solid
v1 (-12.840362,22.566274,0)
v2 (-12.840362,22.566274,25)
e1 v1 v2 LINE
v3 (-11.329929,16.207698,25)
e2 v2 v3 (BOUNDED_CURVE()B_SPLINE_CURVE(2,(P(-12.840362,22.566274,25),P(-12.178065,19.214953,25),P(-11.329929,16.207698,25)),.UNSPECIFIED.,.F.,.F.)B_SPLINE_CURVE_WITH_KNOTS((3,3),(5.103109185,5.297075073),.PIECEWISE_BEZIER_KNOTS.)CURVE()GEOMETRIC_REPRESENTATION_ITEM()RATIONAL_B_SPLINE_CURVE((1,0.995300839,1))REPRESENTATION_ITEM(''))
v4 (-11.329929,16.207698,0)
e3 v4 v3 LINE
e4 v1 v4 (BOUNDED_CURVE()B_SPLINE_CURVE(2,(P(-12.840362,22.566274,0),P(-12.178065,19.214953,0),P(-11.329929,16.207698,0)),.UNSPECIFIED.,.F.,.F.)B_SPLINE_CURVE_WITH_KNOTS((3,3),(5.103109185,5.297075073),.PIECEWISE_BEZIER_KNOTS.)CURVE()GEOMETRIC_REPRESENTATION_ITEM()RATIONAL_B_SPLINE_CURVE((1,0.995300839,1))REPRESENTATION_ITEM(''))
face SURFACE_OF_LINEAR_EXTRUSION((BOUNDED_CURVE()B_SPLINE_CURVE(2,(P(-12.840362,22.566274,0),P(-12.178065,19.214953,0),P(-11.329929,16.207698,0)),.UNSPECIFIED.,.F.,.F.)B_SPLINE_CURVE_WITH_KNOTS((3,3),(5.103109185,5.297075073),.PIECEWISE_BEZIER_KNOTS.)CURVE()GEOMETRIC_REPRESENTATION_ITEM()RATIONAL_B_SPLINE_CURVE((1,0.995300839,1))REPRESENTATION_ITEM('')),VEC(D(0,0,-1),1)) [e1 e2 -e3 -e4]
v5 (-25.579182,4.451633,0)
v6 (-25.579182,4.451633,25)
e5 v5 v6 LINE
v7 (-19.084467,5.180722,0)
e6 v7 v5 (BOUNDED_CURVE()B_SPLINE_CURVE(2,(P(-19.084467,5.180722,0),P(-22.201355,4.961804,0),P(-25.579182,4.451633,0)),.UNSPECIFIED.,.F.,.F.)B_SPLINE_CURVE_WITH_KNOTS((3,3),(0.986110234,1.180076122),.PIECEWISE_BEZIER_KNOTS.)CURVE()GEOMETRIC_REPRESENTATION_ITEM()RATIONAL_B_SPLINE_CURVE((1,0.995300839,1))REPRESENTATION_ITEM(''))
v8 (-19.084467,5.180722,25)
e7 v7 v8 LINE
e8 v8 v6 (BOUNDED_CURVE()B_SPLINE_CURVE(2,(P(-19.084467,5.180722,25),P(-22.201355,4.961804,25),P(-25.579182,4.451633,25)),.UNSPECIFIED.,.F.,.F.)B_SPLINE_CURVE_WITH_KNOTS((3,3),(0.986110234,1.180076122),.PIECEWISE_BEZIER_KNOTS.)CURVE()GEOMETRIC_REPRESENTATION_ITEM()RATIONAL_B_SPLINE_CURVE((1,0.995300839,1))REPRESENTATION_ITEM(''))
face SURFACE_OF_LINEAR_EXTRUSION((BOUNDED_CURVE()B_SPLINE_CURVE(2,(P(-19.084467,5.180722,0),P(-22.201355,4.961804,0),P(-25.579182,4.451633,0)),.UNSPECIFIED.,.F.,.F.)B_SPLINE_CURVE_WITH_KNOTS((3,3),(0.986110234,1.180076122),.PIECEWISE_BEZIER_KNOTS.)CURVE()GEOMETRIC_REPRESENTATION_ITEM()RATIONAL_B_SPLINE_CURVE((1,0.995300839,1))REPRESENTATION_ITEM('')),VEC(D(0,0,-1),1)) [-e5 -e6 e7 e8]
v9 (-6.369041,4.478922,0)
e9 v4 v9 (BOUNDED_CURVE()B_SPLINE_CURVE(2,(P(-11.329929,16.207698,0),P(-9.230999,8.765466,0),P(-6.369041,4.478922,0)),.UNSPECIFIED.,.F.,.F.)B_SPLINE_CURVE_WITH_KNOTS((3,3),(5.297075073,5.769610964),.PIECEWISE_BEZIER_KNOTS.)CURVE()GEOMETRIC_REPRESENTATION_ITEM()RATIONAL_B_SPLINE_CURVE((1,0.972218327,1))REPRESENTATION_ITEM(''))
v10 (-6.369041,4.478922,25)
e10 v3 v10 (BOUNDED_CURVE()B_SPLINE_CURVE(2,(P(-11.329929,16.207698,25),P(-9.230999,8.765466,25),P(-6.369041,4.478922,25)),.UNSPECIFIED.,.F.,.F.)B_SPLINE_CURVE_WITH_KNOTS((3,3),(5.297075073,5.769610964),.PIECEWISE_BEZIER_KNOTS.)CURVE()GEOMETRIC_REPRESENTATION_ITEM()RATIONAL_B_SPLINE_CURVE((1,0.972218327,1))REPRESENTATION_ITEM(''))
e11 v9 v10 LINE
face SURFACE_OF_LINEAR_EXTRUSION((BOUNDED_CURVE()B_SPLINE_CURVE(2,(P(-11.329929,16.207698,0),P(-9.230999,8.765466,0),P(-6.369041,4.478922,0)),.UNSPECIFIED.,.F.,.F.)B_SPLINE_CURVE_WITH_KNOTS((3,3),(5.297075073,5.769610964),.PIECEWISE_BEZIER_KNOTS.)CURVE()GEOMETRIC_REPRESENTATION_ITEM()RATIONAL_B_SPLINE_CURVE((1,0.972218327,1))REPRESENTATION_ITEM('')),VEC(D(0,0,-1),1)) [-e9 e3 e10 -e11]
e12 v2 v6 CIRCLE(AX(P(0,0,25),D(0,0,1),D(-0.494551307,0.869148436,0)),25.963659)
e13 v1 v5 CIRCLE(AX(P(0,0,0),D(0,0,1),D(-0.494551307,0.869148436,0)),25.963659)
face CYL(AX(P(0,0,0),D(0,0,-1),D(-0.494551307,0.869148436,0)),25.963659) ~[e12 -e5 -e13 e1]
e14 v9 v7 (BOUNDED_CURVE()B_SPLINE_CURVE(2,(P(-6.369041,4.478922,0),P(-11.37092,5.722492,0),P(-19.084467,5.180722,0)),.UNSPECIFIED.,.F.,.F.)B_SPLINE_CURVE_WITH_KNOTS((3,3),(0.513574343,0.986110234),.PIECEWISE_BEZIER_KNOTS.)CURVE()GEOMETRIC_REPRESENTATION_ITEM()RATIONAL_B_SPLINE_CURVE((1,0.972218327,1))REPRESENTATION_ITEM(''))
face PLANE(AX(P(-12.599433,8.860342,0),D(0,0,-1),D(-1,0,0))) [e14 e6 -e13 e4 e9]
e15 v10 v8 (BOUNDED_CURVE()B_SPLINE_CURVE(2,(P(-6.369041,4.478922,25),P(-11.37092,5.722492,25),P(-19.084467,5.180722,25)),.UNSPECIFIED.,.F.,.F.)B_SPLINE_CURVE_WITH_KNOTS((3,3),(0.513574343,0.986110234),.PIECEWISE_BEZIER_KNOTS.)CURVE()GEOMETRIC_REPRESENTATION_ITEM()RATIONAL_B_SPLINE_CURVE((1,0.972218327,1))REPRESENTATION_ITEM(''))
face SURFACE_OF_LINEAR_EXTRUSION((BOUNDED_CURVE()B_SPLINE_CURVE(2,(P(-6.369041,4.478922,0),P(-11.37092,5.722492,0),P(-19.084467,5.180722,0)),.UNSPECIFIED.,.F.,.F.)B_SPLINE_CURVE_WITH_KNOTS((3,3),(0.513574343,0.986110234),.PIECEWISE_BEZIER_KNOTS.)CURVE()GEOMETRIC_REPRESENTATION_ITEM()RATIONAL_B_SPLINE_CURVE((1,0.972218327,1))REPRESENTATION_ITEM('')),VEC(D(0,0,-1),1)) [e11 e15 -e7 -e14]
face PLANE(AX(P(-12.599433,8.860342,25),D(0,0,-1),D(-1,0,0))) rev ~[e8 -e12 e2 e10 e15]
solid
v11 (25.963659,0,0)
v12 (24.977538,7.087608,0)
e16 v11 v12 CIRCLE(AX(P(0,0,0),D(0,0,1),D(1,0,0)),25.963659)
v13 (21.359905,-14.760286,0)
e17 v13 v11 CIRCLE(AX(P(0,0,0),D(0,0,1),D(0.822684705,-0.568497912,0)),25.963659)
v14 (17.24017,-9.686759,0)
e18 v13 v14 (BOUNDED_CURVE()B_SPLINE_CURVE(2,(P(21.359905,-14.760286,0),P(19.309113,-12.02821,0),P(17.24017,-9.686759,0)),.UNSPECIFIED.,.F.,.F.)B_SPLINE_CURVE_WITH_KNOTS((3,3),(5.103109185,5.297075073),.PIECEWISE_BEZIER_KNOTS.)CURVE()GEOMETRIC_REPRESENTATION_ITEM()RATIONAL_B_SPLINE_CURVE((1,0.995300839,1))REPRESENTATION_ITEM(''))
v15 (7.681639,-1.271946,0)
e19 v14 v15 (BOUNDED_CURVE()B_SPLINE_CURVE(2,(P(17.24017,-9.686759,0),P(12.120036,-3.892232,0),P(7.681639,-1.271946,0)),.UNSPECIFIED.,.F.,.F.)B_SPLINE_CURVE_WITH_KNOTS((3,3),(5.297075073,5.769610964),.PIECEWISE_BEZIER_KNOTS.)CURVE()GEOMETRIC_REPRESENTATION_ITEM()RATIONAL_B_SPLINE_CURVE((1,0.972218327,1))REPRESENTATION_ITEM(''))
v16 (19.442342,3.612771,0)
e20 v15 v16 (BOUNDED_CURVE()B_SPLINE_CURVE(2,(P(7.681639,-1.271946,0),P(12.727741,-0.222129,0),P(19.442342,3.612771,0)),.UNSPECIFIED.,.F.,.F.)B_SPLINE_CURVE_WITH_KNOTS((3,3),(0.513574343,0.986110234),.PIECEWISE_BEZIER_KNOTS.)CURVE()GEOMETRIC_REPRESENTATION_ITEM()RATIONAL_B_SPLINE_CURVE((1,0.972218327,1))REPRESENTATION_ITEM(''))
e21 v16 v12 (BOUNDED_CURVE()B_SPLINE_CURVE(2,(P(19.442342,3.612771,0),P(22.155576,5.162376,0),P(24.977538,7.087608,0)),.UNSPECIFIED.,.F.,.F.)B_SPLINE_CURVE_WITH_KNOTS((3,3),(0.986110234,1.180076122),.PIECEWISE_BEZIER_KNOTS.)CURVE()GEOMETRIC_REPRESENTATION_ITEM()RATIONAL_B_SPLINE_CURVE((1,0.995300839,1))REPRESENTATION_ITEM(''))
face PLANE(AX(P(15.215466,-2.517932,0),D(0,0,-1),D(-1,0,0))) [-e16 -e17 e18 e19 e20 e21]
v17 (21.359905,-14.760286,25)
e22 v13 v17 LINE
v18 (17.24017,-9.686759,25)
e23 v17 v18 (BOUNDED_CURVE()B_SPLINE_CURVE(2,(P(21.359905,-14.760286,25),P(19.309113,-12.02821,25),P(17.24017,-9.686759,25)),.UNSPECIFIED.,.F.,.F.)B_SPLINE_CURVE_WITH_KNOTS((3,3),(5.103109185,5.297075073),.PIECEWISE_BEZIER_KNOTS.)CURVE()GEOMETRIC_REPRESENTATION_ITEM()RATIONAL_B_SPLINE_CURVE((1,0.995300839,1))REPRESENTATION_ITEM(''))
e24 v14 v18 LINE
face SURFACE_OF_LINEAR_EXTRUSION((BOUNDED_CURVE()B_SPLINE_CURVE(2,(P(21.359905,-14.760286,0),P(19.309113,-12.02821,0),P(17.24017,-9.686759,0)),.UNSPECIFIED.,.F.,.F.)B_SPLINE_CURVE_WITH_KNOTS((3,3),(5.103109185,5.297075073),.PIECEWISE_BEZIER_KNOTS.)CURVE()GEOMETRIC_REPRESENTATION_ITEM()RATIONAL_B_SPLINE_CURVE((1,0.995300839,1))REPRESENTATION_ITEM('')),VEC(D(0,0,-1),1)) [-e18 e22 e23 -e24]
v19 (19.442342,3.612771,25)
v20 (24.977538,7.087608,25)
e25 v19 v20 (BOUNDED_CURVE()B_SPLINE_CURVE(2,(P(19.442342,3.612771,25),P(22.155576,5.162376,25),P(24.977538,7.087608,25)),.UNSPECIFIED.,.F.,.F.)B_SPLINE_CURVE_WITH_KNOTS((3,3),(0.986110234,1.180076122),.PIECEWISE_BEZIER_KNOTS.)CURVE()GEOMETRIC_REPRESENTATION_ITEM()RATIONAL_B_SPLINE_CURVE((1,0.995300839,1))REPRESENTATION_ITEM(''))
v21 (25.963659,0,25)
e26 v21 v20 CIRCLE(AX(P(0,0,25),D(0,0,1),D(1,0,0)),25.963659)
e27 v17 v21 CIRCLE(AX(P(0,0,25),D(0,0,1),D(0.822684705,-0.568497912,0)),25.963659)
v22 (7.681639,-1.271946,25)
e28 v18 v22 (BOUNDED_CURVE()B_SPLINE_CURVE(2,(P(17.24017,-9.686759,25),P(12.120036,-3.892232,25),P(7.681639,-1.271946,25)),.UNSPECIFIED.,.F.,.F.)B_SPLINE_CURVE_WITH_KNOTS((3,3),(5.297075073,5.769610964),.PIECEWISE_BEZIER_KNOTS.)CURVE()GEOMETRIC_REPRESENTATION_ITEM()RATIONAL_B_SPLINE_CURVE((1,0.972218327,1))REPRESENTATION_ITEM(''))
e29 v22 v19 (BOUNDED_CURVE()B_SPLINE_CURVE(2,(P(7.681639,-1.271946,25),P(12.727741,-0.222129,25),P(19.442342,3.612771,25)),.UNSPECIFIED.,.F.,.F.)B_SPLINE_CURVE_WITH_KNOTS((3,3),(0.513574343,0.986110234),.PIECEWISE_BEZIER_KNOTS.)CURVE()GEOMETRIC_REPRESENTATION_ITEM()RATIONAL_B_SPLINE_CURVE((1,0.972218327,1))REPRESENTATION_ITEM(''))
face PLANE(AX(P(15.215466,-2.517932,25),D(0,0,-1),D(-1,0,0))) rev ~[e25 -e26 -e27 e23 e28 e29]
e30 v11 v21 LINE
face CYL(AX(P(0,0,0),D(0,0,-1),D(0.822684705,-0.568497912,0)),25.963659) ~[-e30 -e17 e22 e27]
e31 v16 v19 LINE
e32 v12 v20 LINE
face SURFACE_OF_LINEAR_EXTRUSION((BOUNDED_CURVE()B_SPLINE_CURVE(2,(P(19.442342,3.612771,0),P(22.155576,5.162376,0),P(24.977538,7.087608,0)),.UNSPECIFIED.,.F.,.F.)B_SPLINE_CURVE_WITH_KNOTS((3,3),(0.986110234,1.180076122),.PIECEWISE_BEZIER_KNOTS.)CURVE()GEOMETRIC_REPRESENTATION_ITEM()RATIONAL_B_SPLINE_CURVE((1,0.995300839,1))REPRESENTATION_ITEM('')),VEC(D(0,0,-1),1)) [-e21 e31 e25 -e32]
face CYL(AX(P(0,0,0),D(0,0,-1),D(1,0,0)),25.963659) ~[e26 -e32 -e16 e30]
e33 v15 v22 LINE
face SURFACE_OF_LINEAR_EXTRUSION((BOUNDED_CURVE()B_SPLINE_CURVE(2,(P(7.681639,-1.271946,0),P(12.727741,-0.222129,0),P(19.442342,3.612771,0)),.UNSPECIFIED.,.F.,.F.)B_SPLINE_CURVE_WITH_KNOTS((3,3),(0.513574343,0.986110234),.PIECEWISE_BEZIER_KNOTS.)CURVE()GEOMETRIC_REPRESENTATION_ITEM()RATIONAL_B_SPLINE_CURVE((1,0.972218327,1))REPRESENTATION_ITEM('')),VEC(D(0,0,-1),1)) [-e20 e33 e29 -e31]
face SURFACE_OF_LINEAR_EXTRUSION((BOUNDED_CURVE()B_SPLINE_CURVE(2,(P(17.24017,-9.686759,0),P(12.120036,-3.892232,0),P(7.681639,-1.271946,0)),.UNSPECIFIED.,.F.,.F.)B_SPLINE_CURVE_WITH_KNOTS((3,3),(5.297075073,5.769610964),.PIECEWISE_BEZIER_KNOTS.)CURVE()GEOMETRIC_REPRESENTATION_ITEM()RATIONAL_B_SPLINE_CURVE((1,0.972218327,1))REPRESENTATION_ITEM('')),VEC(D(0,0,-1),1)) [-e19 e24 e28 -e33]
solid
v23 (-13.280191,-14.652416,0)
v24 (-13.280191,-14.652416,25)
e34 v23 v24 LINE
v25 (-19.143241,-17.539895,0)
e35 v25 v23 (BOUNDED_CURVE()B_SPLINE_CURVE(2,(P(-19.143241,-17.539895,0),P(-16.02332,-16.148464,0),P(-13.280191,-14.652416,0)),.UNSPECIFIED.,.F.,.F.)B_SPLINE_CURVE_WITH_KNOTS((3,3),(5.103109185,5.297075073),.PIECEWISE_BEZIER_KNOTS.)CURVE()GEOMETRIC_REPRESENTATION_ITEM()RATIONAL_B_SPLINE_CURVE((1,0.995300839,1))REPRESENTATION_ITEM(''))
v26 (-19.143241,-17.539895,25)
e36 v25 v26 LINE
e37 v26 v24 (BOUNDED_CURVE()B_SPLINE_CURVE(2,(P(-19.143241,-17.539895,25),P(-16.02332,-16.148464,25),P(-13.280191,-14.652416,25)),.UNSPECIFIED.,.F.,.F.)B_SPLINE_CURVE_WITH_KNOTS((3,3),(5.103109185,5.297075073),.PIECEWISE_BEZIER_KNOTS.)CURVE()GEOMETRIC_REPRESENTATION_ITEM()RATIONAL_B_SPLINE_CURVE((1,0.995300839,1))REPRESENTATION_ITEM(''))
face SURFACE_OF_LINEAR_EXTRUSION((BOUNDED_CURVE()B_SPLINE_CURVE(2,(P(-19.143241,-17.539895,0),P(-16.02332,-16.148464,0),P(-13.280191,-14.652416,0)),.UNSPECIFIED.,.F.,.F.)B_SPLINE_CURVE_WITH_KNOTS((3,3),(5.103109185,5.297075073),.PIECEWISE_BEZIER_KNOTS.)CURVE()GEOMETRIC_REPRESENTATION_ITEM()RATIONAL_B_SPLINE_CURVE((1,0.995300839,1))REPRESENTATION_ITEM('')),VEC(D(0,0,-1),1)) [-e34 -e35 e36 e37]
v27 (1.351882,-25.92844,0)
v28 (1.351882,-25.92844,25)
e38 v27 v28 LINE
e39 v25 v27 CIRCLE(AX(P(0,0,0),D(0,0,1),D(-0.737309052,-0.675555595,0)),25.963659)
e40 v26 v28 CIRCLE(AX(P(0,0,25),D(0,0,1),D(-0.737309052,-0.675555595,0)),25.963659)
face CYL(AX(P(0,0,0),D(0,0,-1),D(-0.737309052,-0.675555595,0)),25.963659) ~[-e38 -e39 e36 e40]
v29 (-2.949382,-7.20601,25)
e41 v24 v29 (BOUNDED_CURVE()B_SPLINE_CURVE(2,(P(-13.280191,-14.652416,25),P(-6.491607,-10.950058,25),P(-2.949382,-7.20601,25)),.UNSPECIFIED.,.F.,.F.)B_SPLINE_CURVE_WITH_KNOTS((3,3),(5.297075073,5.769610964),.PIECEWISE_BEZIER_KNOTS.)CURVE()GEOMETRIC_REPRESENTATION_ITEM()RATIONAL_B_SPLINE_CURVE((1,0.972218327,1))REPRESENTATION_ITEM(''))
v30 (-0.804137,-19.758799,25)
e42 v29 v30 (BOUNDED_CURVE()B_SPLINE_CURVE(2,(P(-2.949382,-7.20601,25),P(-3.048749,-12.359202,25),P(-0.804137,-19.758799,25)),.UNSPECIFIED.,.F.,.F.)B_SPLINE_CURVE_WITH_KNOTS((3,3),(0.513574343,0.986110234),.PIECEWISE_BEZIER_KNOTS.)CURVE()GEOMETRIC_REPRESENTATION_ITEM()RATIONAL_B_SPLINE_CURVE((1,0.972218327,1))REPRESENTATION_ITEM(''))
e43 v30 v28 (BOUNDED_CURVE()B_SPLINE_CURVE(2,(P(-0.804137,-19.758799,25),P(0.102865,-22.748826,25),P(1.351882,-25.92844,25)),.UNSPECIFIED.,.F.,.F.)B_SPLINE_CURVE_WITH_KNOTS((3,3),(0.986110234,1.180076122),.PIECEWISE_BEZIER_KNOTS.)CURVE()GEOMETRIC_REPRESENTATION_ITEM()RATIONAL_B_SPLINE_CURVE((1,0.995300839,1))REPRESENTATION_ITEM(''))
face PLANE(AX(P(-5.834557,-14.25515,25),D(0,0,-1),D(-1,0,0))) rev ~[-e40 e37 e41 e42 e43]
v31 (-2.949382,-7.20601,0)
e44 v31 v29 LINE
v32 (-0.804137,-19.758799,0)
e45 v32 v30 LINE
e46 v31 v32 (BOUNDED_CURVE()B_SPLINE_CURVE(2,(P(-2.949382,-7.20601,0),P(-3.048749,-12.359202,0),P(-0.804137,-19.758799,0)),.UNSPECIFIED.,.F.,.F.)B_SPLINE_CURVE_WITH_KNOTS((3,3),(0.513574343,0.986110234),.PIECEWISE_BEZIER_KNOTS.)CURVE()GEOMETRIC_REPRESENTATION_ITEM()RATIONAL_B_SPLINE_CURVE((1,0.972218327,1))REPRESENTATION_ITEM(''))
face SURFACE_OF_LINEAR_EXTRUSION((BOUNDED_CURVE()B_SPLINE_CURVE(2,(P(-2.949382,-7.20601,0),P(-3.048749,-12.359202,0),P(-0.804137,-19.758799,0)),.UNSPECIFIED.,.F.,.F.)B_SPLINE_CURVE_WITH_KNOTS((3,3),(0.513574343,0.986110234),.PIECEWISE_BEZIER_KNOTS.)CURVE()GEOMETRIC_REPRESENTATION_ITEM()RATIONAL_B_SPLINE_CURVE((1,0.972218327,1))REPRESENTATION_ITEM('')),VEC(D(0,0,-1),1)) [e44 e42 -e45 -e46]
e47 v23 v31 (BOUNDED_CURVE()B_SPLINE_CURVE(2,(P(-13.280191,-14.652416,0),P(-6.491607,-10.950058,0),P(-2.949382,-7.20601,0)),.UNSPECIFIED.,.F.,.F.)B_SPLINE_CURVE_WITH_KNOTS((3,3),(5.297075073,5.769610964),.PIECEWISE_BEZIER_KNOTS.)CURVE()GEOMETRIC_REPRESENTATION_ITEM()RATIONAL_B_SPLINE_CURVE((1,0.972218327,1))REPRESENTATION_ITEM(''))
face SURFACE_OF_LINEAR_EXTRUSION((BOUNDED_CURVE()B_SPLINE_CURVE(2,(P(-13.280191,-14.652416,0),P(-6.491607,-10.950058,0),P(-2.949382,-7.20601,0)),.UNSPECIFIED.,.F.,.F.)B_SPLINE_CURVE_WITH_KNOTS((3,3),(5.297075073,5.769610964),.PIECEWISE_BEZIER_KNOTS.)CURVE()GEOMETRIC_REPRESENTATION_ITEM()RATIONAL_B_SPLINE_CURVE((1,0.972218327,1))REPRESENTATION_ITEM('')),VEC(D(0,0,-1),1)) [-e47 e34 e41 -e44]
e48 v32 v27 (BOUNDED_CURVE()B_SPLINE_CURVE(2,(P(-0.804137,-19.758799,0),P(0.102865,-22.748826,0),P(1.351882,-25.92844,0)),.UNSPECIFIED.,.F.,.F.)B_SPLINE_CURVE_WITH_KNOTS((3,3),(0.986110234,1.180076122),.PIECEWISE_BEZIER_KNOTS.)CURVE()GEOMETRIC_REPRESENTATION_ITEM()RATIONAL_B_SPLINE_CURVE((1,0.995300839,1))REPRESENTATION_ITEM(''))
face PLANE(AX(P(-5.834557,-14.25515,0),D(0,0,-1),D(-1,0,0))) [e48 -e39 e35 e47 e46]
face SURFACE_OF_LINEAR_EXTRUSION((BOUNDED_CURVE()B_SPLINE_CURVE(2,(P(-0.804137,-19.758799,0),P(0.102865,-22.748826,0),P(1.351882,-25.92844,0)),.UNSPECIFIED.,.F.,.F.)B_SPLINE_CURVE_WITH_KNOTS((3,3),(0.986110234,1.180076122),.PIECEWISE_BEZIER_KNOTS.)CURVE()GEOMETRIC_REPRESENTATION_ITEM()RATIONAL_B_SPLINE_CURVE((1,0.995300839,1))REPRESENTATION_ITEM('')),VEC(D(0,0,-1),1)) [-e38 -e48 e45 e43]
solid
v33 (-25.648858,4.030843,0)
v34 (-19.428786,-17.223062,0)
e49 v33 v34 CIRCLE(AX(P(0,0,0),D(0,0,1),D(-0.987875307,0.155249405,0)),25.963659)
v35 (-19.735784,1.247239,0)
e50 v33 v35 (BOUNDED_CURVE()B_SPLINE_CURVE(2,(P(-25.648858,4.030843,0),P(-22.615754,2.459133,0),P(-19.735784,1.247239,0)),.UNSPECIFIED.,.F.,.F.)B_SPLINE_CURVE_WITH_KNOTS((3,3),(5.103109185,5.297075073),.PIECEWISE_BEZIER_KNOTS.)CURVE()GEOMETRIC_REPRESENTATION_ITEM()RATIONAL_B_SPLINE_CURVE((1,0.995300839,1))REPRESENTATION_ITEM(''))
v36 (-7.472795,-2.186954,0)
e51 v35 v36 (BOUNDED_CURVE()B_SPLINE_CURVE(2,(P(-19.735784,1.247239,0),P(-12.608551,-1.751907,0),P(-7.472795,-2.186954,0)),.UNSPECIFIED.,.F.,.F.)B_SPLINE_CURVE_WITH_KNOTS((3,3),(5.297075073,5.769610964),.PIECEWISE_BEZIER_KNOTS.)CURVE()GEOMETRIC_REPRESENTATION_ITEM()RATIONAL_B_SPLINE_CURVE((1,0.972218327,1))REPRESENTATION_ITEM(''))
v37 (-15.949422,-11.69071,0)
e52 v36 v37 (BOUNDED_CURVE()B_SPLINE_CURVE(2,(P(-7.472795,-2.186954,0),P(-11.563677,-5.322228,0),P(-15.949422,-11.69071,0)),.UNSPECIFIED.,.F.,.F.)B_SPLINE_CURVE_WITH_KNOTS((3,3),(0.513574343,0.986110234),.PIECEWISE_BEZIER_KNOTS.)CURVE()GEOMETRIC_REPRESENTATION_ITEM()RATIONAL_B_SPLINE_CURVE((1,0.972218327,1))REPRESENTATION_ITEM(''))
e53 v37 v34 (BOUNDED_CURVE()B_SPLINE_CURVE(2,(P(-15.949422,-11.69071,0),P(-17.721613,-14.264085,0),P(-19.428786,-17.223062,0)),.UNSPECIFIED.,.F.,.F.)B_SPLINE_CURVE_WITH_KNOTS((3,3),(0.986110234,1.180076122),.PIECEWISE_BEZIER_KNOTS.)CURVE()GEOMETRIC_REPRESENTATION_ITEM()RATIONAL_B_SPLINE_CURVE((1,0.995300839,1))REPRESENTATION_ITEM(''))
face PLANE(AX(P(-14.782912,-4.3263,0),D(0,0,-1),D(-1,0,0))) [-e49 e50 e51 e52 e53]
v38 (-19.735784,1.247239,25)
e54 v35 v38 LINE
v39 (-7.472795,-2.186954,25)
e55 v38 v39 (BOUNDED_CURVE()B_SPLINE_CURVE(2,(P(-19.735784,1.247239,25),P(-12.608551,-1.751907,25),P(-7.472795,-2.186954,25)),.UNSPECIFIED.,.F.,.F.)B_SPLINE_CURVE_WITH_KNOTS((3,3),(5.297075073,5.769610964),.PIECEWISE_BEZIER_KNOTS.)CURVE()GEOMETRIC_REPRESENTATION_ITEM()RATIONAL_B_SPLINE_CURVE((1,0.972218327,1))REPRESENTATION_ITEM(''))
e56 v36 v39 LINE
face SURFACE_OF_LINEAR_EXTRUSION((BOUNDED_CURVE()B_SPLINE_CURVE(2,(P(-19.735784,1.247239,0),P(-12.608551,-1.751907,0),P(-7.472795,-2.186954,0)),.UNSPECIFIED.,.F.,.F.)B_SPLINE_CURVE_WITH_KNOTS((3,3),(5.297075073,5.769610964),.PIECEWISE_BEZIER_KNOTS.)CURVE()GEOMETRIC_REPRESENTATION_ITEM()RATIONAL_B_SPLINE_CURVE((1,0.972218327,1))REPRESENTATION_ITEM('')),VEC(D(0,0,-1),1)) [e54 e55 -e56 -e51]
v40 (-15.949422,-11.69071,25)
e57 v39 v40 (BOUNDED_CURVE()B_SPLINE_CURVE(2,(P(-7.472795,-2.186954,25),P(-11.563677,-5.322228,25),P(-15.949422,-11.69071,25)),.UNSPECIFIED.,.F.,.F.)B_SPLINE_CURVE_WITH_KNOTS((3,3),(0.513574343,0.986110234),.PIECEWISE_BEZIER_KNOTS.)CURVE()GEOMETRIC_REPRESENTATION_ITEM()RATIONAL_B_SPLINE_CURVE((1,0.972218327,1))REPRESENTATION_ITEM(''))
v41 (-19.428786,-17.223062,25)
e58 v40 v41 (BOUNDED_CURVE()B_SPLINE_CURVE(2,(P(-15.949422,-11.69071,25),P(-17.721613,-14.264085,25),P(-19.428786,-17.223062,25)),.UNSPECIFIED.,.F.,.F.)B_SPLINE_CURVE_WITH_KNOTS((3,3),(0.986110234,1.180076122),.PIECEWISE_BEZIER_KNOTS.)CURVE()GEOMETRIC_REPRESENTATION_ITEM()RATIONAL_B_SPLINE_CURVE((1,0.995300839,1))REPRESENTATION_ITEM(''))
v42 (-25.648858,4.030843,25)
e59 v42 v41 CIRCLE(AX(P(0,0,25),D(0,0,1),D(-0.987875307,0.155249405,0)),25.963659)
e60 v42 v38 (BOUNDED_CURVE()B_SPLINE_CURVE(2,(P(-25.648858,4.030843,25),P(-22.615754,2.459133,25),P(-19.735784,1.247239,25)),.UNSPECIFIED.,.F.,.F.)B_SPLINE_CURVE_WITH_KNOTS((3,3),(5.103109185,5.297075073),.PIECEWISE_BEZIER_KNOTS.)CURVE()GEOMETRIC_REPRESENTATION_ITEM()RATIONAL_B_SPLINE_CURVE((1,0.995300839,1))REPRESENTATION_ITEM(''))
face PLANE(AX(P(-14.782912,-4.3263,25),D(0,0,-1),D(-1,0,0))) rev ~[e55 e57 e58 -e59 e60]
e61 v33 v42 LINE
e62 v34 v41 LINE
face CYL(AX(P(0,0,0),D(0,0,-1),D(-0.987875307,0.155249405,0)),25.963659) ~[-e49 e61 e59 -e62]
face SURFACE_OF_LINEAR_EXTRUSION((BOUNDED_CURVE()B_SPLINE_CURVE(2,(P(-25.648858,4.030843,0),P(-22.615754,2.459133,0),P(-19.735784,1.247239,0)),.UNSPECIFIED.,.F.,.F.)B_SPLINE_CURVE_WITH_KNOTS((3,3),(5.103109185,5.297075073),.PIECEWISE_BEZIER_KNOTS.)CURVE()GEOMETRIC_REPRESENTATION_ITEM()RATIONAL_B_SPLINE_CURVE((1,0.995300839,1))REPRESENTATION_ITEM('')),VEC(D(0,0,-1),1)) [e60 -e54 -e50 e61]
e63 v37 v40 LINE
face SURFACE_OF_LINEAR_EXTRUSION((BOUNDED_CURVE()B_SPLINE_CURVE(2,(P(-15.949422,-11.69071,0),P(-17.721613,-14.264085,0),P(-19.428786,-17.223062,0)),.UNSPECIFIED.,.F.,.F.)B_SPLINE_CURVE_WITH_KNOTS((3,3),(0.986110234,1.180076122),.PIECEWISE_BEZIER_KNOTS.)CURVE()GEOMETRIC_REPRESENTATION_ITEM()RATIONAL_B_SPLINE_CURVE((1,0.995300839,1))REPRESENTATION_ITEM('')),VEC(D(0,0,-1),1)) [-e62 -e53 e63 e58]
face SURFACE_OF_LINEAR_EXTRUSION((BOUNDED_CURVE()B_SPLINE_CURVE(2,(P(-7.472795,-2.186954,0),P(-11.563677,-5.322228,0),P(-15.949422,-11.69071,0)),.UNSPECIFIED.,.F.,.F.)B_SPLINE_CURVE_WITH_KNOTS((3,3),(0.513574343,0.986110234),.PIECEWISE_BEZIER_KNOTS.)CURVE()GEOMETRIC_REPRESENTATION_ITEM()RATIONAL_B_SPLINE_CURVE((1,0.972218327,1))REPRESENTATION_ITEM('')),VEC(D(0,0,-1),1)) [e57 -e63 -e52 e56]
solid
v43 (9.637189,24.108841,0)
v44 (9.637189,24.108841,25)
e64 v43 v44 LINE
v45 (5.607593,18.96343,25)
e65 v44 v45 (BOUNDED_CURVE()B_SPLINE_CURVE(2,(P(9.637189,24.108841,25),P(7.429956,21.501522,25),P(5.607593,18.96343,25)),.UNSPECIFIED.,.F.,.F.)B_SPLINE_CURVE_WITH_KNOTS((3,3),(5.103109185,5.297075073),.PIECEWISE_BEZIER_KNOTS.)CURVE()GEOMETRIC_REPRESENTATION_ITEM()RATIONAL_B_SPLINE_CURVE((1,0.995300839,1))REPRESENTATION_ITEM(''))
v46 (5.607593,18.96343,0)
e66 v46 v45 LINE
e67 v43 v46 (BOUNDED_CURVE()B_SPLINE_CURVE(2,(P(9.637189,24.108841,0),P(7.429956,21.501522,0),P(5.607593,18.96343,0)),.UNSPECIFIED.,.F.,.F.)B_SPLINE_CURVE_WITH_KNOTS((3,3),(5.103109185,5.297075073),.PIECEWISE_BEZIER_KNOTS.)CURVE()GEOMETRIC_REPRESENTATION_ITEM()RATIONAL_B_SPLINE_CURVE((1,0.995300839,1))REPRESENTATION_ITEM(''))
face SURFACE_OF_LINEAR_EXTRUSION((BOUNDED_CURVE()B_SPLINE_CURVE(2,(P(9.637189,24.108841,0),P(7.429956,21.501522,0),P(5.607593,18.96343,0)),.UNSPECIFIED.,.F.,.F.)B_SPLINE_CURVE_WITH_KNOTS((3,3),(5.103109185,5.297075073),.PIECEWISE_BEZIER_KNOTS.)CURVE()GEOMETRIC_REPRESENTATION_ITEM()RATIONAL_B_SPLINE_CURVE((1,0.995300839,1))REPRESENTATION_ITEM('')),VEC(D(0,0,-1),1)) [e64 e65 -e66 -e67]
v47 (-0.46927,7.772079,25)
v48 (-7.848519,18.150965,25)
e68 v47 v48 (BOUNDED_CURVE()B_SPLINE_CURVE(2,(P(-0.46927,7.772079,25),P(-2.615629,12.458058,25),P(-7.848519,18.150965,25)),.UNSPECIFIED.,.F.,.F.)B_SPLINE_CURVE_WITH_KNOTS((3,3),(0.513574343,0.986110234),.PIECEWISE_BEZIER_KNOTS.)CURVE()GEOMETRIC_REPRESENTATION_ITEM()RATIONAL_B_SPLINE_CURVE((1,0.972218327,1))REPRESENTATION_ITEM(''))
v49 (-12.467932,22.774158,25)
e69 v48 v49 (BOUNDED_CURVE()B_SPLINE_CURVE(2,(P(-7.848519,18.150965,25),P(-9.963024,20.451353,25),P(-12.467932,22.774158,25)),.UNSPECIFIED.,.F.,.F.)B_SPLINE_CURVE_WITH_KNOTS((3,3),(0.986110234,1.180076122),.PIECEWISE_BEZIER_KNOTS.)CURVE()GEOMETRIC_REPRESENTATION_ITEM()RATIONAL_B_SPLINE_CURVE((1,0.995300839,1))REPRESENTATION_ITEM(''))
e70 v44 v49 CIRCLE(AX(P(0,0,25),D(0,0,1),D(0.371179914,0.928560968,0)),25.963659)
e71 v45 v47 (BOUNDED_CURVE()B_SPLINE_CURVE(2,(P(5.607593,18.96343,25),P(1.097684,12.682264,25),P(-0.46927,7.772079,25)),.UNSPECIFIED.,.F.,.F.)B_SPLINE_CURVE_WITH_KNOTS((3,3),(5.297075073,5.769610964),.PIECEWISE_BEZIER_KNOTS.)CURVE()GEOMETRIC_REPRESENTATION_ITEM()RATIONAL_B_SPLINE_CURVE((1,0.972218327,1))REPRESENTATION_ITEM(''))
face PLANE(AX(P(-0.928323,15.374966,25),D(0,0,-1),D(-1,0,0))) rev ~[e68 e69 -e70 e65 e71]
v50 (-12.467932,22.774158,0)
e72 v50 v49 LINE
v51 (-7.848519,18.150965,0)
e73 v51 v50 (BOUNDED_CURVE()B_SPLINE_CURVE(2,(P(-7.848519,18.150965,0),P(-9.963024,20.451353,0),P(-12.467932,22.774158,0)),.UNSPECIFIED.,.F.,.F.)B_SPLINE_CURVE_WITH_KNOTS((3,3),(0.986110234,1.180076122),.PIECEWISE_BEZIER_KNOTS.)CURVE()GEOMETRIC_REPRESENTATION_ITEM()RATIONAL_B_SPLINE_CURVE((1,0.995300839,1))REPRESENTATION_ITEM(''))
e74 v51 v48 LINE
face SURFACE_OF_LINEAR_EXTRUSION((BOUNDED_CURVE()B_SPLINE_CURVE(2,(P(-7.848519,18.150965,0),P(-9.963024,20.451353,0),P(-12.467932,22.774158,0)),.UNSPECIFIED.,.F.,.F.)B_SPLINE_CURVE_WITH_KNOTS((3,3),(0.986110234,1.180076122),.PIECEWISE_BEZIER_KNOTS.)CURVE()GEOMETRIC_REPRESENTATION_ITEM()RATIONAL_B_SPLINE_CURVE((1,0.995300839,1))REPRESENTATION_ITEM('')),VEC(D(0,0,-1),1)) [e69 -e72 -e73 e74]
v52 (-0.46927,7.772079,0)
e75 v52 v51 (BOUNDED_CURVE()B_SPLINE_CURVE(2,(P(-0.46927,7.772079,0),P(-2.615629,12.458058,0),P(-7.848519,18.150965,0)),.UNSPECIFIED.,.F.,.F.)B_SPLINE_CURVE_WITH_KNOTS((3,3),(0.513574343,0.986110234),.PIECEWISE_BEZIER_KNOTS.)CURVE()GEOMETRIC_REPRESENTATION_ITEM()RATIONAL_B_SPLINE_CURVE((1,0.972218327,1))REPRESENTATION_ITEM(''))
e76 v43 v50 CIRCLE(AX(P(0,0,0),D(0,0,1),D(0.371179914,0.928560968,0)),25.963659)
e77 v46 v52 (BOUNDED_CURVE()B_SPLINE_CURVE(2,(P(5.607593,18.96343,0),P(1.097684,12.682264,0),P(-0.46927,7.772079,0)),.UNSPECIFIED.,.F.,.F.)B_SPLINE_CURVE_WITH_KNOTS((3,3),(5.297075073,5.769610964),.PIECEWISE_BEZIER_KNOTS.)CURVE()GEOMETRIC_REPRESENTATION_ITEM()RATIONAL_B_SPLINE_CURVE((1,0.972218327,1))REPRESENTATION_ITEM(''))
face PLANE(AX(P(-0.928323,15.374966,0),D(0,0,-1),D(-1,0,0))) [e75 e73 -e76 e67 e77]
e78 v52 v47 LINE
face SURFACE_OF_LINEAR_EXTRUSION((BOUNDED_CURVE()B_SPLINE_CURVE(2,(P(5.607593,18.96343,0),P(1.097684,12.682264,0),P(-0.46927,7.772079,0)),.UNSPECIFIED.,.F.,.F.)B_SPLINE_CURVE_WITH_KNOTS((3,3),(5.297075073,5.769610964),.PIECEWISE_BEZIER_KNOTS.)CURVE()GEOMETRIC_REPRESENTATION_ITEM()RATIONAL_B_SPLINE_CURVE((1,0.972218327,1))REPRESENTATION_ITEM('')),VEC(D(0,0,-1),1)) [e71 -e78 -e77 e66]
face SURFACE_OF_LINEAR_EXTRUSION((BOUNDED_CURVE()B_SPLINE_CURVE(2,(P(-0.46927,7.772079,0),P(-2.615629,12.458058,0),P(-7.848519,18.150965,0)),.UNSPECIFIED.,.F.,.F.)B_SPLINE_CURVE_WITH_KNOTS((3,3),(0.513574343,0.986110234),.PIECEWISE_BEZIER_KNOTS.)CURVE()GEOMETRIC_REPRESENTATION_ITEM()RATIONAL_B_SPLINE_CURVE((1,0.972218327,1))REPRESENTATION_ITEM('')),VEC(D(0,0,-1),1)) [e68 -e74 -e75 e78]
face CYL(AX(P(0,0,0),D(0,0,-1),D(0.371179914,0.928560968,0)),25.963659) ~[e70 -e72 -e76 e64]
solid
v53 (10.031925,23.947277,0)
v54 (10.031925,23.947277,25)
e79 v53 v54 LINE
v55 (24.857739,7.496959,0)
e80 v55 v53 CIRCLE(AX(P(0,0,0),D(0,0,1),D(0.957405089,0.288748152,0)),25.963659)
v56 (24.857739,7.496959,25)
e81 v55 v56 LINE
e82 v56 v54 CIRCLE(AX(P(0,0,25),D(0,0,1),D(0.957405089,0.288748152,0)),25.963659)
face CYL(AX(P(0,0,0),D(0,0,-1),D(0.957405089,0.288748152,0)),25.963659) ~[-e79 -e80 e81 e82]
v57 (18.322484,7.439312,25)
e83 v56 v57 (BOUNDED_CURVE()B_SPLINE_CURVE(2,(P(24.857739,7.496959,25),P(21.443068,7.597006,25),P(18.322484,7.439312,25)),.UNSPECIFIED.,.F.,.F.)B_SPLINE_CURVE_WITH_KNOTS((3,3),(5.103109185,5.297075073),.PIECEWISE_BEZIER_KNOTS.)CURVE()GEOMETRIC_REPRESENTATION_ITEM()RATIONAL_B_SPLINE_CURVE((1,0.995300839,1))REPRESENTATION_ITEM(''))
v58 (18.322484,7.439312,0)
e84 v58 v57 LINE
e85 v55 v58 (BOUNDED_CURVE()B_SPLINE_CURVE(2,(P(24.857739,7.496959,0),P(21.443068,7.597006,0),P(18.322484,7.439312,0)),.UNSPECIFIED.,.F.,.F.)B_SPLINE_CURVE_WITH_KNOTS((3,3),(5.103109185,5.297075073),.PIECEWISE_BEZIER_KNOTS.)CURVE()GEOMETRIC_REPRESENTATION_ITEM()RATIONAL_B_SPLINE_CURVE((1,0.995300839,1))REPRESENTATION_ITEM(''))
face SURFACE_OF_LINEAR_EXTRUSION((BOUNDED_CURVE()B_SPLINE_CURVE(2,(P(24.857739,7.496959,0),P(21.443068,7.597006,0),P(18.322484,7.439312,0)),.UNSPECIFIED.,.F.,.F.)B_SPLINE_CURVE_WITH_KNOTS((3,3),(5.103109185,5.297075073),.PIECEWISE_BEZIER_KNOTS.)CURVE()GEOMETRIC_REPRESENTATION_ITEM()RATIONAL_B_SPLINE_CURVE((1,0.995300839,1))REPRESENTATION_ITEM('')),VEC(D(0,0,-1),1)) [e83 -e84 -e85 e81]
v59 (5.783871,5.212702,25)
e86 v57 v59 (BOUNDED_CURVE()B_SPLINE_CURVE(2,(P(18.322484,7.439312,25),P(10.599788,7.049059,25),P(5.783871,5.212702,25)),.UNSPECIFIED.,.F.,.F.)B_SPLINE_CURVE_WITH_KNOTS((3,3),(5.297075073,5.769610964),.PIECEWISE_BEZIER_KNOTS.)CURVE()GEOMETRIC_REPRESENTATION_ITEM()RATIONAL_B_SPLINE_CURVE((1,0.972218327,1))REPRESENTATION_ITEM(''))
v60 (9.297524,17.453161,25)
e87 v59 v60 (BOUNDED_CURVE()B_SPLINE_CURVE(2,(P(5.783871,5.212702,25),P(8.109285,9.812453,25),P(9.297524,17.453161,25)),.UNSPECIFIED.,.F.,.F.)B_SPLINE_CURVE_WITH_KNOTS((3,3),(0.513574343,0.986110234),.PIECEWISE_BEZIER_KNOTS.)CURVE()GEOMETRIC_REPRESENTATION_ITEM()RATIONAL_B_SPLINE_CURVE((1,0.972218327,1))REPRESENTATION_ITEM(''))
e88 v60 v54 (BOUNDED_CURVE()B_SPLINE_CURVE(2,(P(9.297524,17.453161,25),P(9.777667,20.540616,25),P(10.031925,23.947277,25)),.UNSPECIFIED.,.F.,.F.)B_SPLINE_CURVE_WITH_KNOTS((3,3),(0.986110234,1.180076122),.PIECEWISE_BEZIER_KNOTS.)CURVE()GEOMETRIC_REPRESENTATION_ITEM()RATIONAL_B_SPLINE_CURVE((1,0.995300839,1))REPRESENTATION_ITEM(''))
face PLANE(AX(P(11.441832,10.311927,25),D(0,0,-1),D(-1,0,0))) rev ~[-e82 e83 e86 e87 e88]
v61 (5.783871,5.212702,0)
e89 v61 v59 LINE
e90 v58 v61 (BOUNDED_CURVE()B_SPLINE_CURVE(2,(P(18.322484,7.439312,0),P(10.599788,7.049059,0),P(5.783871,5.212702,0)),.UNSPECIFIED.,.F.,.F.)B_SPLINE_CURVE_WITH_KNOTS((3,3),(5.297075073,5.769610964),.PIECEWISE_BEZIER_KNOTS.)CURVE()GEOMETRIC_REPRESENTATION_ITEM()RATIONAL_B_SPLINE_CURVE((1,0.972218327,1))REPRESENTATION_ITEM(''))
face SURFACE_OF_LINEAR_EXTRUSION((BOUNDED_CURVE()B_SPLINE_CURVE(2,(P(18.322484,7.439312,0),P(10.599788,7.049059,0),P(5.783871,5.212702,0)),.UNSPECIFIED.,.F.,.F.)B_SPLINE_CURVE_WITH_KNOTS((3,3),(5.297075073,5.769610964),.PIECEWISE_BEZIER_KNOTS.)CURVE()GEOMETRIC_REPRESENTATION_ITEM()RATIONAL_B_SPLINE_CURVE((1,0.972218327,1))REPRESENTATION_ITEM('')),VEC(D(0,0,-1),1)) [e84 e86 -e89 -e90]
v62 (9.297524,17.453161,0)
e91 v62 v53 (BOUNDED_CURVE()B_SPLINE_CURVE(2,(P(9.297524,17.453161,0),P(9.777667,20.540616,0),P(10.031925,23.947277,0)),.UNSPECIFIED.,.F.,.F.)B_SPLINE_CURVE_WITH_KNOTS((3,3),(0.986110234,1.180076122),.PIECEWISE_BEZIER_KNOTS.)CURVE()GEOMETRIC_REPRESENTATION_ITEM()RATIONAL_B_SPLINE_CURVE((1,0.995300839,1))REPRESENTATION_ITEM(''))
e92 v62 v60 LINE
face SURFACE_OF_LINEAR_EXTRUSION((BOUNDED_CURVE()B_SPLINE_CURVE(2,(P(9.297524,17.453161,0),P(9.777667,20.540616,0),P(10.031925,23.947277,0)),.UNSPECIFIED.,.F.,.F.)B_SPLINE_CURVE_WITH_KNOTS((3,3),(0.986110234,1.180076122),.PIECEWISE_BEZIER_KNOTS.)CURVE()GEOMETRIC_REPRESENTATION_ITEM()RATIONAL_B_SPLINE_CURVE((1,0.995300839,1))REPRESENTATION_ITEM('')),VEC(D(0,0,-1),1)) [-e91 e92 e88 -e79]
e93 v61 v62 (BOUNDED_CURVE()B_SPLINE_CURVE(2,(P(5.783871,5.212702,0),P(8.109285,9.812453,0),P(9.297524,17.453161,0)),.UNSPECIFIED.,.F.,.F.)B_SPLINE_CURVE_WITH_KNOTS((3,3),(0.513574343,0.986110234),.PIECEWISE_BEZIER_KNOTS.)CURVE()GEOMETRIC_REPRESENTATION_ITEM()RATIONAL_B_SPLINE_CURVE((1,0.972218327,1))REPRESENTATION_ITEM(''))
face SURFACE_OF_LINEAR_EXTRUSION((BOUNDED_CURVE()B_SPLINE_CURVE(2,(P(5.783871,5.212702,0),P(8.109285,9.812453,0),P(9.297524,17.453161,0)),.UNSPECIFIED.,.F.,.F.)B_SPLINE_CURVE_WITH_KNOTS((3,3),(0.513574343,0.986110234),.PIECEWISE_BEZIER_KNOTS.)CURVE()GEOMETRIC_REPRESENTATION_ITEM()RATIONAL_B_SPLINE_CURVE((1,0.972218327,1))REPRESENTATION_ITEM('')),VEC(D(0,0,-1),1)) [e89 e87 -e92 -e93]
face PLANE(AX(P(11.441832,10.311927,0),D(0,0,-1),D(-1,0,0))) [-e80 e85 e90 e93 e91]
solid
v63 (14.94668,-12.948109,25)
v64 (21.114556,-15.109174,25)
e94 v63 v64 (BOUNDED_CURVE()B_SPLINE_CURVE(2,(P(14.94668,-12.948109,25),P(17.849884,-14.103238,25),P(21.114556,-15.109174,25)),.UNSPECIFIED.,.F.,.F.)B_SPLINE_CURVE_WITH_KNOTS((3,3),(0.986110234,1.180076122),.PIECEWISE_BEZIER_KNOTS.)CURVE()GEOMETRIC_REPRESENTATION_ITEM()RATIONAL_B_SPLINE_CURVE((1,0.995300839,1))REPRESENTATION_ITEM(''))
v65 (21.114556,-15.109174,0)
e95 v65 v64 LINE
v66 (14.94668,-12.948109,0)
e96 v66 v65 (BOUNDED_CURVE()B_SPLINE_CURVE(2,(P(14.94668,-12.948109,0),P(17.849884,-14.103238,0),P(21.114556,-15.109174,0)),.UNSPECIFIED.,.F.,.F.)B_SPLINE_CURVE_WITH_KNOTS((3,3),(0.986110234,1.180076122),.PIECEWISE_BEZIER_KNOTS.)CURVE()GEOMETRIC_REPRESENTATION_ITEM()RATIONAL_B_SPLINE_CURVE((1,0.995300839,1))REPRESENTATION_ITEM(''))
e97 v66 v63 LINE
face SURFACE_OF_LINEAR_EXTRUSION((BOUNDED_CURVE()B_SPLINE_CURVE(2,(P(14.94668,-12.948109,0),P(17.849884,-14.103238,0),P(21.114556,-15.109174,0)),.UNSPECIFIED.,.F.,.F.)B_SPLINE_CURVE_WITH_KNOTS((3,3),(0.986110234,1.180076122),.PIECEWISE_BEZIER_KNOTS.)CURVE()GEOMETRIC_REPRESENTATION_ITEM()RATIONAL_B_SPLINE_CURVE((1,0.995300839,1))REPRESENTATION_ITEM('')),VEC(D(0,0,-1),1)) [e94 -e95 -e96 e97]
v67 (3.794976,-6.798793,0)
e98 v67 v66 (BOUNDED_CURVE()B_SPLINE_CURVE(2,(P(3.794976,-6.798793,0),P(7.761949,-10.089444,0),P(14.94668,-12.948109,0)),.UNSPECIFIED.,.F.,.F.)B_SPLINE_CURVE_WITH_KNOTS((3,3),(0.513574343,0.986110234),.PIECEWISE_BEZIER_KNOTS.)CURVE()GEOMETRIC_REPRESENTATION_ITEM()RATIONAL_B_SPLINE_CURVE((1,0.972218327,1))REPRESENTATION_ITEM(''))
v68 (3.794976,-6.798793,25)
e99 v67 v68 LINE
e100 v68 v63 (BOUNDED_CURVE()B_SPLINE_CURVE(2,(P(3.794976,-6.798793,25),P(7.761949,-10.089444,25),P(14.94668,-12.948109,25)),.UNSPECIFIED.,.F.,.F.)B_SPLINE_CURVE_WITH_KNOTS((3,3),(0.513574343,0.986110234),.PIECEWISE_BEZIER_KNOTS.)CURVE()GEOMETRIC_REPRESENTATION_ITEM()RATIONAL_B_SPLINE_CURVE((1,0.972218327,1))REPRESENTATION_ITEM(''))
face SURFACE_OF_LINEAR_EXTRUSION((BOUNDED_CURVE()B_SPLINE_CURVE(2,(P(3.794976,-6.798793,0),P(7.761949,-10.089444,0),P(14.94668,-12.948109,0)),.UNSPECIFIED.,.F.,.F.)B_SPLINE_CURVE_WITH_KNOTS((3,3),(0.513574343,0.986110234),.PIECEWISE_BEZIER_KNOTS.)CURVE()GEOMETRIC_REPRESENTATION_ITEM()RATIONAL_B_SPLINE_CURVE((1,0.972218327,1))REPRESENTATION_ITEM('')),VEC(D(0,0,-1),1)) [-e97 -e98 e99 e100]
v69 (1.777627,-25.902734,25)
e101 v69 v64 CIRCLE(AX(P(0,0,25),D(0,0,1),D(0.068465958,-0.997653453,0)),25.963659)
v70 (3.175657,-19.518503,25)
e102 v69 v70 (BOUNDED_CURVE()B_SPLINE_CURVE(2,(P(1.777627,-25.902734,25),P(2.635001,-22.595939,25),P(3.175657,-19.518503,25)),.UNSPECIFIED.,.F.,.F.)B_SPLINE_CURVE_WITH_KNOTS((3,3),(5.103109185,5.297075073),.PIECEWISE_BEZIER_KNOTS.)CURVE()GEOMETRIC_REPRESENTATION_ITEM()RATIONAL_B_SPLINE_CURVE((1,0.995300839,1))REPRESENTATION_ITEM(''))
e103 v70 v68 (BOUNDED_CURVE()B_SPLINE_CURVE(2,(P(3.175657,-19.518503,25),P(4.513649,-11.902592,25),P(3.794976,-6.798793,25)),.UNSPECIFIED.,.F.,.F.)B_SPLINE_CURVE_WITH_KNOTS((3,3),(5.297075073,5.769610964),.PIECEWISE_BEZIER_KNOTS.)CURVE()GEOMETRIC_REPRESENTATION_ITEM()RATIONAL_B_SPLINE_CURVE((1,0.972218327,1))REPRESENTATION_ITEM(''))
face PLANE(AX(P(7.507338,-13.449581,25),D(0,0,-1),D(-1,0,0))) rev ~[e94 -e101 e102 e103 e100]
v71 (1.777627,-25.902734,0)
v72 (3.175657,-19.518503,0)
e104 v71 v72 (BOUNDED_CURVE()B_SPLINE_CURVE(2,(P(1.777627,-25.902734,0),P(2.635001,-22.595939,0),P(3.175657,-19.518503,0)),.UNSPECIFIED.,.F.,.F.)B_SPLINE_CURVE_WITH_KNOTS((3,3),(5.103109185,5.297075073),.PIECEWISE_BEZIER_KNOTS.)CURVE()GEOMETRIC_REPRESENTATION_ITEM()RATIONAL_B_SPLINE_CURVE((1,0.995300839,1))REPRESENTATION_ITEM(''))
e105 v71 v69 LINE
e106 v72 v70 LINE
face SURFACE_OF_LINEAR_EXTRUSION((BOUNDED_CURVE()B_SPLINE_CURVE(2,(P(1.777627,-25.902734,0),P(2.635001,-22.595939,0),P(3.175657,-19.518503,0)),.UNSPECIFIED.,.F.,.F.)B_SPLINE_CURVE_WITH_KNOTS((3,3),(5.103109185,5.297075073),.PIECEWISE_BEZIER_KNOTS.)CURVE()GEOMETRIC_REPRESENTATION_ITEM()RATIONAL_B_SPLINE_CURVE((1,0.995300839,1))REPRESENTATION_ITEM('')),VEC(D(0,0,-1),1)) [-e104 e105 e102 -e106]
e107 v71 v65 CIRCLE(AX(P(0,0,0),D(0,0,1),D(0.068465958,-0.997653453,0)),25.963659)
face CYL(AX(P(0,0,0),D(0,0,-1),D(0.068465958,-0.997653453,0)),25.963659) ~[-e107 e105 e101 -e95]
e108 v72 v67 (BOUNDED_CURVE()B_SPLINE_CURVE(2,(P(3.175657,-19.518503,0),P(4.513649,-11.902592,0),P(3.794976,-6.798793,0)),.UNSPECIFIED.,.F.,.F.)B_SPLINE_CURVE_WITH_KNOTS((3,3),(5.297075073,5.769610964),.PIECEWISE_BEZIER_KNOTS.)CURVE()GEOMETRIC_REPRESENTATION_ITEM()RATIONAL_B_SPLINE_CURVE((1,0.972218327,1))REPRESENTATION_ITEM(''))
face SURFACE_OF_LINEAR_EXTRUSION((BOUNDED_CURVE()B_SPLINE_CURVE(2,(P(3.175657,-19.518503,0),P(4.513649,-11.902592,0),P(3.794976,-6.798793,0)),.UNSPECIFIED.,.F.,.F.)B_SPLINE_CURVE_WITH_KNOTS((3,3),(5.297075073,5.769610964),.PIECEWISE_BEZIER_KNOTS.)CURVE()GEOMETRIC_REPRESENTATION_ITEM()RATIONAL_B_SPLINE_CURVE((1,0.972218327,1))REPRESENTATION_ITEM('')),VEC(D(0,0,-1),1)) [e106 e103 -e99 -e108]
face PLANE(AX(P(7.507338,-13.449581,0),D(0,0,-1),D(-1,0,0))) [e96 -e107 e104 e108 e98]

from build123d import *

# Parameters (mm, degrees)
F1_DEPTH = 25


# Not quite as in the source:
# - the program builds the solid bodies; features that only make, move or delete a surface that nothing else refers to are left out


with BuildPart() as f1:
    # F0 (on Top) → F1 (new body)
    with BuildSketch(Plane.XY):
        with BuildLine():
            add(Edge.make_bspline(
                [(-0.4692695513, 7.7720791406), (-2.6156286588, 12.4580584803), (-7.8485191875, 18.1509645982)],
                knots=[0.5135743426, 0.5135743426, 0.5135743426, 0.9861102341, 0.9861102341, 0.9861102341], degree=2, weights=[1, 0.9722183274, 1]))
            add(Edge.make_bspline(
                [(5.6075930615, 18.9634297884), (1.0976837537, 12.682264181), (-0.4692695513, 7.7720791406)],
                knots=[5.2970750731, 5.2970750731, 5.2970750731, 5.7696109645, 5.7696109645, 5.7696109645], degree=2, weights=[1, 0.9722183274, 1]))
            ThreePointArc((5.6075930615, 18.9634297884), (-1.1918315304, 19.739207352), (-7.8485191875, 18.1509645982))
        make_face()
        with BuildLine():
            add(Edge.make_bspline(
                [(-7.8485191875, 18.1509645982), (-9.963024287, 20.4513526823), (-12.4679324412, 22.774157764)],
                knots=[0.9861102341, 0.9861102341, 0.9861102341, 1.1800761223, 1.1800761223, 1.1800761223], degree=2, weights=[1, 0.9953008392, 1]))
            ThreePointArc((-7.8485191875, 18.1509645982), (-1.1918315304, 19.739207352), (5.6075930615, 18.9634297884))
            add(Edge.make_bspline(
                [(9.6371888027, 24.1088405611), (7.4299560897, 21.5015216202), (5.6075930615, 18.9634297884)],
                knots=[5.1031091849, 5.1031091849, 5.1031091849, 5.2970750731, 5.2970750731, 5.2970750731], degree=2, weights=[1, 0.9953008392, 1]))
            ThreePointArc((9.6371888027, 24.1088405611), (-1.5648073137, 25.9164615503), (-12.4679324412, 22.774157764))
        make_face()
    extrude(amount=F1_DEPTH)


with BuildPart() as f1b:
    # F0 (on Top) → F1, piece 2 (new body)
    with BuildSketch(Plane.XY):
        with BuildLine():
            add(Edge.make_bspline(
                [(5.7838713768, 5.2127017923), (8.1092845361, 9.8124532453), (9.297523887, 17.4531607124)],
                knots=[0.5135743426, 0.5135743426, 0.5135743426, 0.9861102341, 0.9861102341, 0.9861102341], degree=2, weights=[1, 0.9722183274, 1]))
            add(Edge.make_bspline(
                [(18.322483511, 7.4393122849), (10.5997880318, 7.0490586649), (5.7838713768, 5.2127017923)],
                knots=[5.2970750731, 5.2970750731, 5.2970750731, 5.7696109645, 5.7696109645, 5.7696109645], degree=2, weights=[1, 0.9722183274, 1]))
            ThreePointArc((18.322483511, 7.4393122849), (14.689638942, 13.239005893), (9.297523887, 17.4531607124))
        make_face()
        with BuildLine():
            ThreePointArc((9.297523887, 17.4531607124), (14.689638942, 13.239005893), (18.322483511, 7.4393122849))
            add(Edge.make_bspline(
                [(24.8577394935, 7.496958616), (21.4430683738, 7.5970058703), (18.322483511, 7.4393122849)],
                knots=[5.1031091849, 5.1031091849, 5.1031091849, 5.2970750731, 5.2970750731, 5.2970750731], degree=2, weights=[1, 0.9953008392, 1]))
            ThreePointArc((24.8577394935, 7.496958616), (19.2866641523, 17.3820650987), (10.0319247992, 23.9472772156))
            add(Edge.make_bspline(
                [(9.297523887, 17.4531607124), (9.7776673475, 20.5406158798), (10.0319247992, 23.9472772156)],
                knots=[0.9861102341, 0.9861102341, 0.9861102341, 1.1800761223, 1.1800761223, 1.1800761223], degree=2, weights=[1, 0.9953008392, 1]))
        make_face()
    extrude(amount=F1_DEPTH)


with BuildPart() as f1c:
    # F0 (on Top) → F1, piece 3 (new body)
    with BuildSketch(Plane.XY):
        with BuildLine():
            add(Edge.make_bspline(
                [(-7.472794591, -2.186954293), (-11.563676812, -5.3222281957), (-15.9494222001, -11.6907100198)],
                knots=[0.5135743426, 0.5135743426, 0.5135743426, 0.9861102341, 0.9861102341, 0.9861102341], degree=2, weights=[1, 0.9722183274, 1]))
            add(Edge.make_bspline(
                [(-19.7357838567, 1.2472388883), (-12.6085509538, -1.75190674), (-7.472794591, -2.186954293)],
                knots=[5.2970750731, 5.2970750731, 5.2970750731, 5.7696109645, 5.7696109645, 5.7696109645], degree=2, weights=[1, 0.9722183274, 1]))
            ThreePointArc((-19.7357838567, 1.2472388883), (-18.9790967465, -5.5543366811), (-15.9494222001, -11.6907100198))
        make_face()
        with BuildLine():
            ThreePointArc((-15.9494222001, -11.6907100198), (-18.9790967465, -5.5543366811), (-19.7357838567, 1.2472388883))
            add(Edge.make_bspline(
                [(-25.6488578464, 4.0308426405), (-22.6157543502, 2.4591329057), (-19.7357838567, 1.2472388883)],
                knots=[5.1031091849, 5.1031091849, 5.1031091849, 5.2970750731, 5.2970750731, 5.2970750731], degree=2, weights=[1, 0.9953008392, 1]))
            ThreePointArc((-25.6488578464, 4.0308426405), (-24.9184793655, -7.2925295563), (-19.4287861092, -17.2230621999))
            add(Edge.make_bspline(
                [(-15.9494222001, -11.6907100198), (-17.7216131025, -14.2640845666), (-19.4287861092, -17.2230621999)],
                knots=[0.9861102341, 0.9861102341, 0.9861102341, 1.1800761223, 1.1800761223, 1.1800761223], degree=2, weights=[1, 0.9953008392, 1]))
        make_face()
    extrude(amount=F1_DEPTH)


with BuildPart() as f1d:
    # F0 (on Top) → F1, piece 4 (new body)
    with BuildSketch(Plane.XY):
        with BuildLine():
            add(Edge.make_bspline(
                [(-2.9493815019, -7.2060097721), (-3.048749004, -12.3592015879), (-0.8041369414, -19.758798877)],
                knots=[0.5135743426, 0.5135743426, 0.5135743426, 0.9861102341, 0.9861102341, 0.9861102341], degree=2, weights=[1, 0.9722183274, 1]))
            add(Edge.make_bspline(
                [(-13.2801905954, -14.652416423), (-6.4916070922, -10.9500580702), (-2.9493815019, -7.2060097721)],
                knots=[5.2970750731, 5.2970750731, 5.2970750731, 5.7696109645, 5.7696109645, 5.7696109645], degree=2, weights=[1, 0.9722183274, 1]))
            ThreePointArc((-13.2801905954, -14.652416423), (-7.4907179885, -18.301527622), (-0.8041369414, -19.758798877))
        make_face()
        with BuildLine():
            ThreePointArc((-0.8041369414, -19.758798877), (-7.4907179885, -18.301527622), (-13.2801905954, -14.652416423))
            add(Edge.make_bspline(
                [(-19.1432409738, -17.5398952745), (-16.023319724, -16.1484644626), (-13.2801905954, -14.652416423)],
                knots=[5.1031091849, 5.1031091849, 5.1031091849, 5.2970750731, 5.2970750731, 5.2970750731], degree=2, weights=[1, 0.9953008392, 1]))
            ThreePointArc((-19.1432409738, -17.5398952745), (-9.8348885682, -24.0288694713), (1.3518822508, -25.9284402847))
            add(Edge.make_bspline(
                [(-0.8041369414, -19.758798877), (0.1028653409, -22.7488263038), (1.3518822508, -25.9284402847)],
                knots=[0.9861102341, 0.9861102341, 0.9861102341, 1.1800761223, 1.1800761223, 1.1800761223], degree=2, weights=[1, 0.9953008392, 1]))
        make_face()
    extrude(amount=F1_DEPTH)


with BuildPart() as f1e:
    # F0 (on Top) → F1, piece 5 (new body)
    with BuildSketch(Plane.XY):
        with BuildLine():
            add(Edge.make_bspline(
                [(-6.3690409359, 4.4789223745), (-11.3709201246, 5.7224915816), (-19.0844672331, 5.1807219294)],
                knots=[0.5135743426, 0.5135743426, 0.5135743426, 0.9861102341, 0.9861102341, 0.9861102341], degree=2, weights=[1, 0.9722183274, 1]))
            add(Edge.make_bspline(
                [(-11.3299293373, 16.2076978777), (-9.2309987796, 8.7654660978), (-6.3690409359, 4.4789223745)],
                knots=[5.2970750731, 5.2970750731, 5.2970750731, 5.7696109645, 5.7696109645, 5.7696109645], degree=2, weights=[1, 0.9722183274, 1]))
            ThreePointArc((-11.3299293373, 16.2076978777), (-16.1758285515, 11.3753830685), (-19.0844672331, 5.1807219294))
        make_face()
        with BuildLine():
            add(Edge.make_bspline(
                [(-19.0844672331, 5.1807219294), (-22.2013554247, 4.9618037835), (-25.579182254, 4.4516330079)],
                knots=[0.9861102341, 0.9861102341, 0.9861102341, 1.1800761223, 1.1800761223, 1.1800761223], degree=2, weights=[1, 0.9953008392, 1]))
            ThreePointArc((-19.0844672331, 5.1807219294), (-16.1758285515, 11.3753830685), (-11.3299293373, 16.2076978777))
            add(Edge.make_bspline(
                [(-12.8403616194, 22.5662738329), (-12.1780646734, 19.2149530389), (-11.3299293373, 16.2076978777)],
                knots=[5.1031091849, 5.1031091849, 5.1031091849, 5.2970750731, 5.2970750731, 5.2970750731], degree=2, weights=[1, 0.9953008392, 1]))
            ThreePointArc((-12.8403616194, 22.5662738329), (-21.2379469562, 14.935233855), (-25.579182254, 4.4516330079))
        make_face()
    extrude(amount=F1_DEPTH)


with BuildPart() as f1f:
    # F0 (on Top) → F1, piece 6 (new body)
    with BuildSketch(Plane.XY):
        with BuildLine():
            add(Edge.make_bspline(
                [(3.7949760146, -6.798792917), (7.7619489872, -10.0894441027), (14.9466798355, -12.9481091738)],
                knots=[0.5135743426, 0.5135743426, 0.5135743426, 0.9861102341, 0.9861102341, 0.9861102341], degree=2, weights=[1, 0.9722183274, 1]))
            add(Edge.make_bspline(
                [(3.1756570507, -19.518503313), (4.5136493145, -11.902592333), (3.7949760146, -6.798792917)],
                knots=[5.2970750731, 5.2970750731, 5.2970750731, 5.7696109645, 5.7696109645, 5.7696109645], degree=2, weights=[1, 0.9722183274, 1]))
            ThreePointArc((3.1756570507, -19.518503313), (9.6383241977, -17.2672949804), (14.9466798355, -12.9481091738))
        make_face()
        with BuildLine():
            ThreePointArc((14.9466798355, -12.9481091738), (9.6383241977, -17.2672949804), (3.1756570507, -19.518503313))
            add(Edge.make_bspline(
                [(1.7776268031, -25.9027342991), (2.6350014706, -22.595938722), (3.1756570507, -19.518503313)],
                knots=[5.1031091849, 5.1031091849, 5.1031091849, 5.2970750731, 5.2970750731, 5.2970750731], degree=2, weights=[1, 0.9953008392, 1]))
            ThreePointArc((1.7776268031, -25.9027342991), (12.6545739161, -22.6709805748), (21.1145557026, -15.1091739914))
            add(Edge.make_bspline(
                [(14.9466798355, -12.9481091738), (17.8498840845, -14.1032378427), (21.1145557026, -15.1091739914)],
                knots=[0.9861102341, 0.9861102341, 0.9861102341, 1.1800761223, 1.1800761223, 1.1800761223], degree=2, weights=[1, 0.9953008392, 1]))
        make_face()
    extrude(amount=F1_DEPTH)


with BuildPart() as f1g:
    # F0 (on Top) → F1, piece 7 (new body)
    with BuildSketch(Plane.XY):
        with BuildLine():
            add(Edge.make_bspline(
                [(7.6816391887, -1.2719463253), (12.7277410761, -0.222129421), (19.4423418396, 3.6127708305)],
                knots=[0.5135743426, 0.5135743426, 0.5135743426, 0.9861102341, 0.9861102341, 0.9861102341], degree=2, weights=[1, 0.9722183274, 1]))
            add(Edge.make_bspline(
                [(17.2401701661, -9.6867591034), (12.1200357257, -3.8922318004), (7.6816391887, -1.2719463253)],
                knots=[5.2970750731, 5.2970750731, 5.2970750731, 5.7696109645, 5.7696109645, 5.7696109645], degree=2, weights=[1, 0.9722183274, 1]))
            ThreePointArc((17.2401701661, -9.6867591034), (19.1309149369, -5.006482094), (19.7751553542, 0))
            ThreePointArc((19.7751553542, 0), (19.6917761973, 1.8140340342), (19.4423418396, 3.6127708305))
        make_face()
        with BuildLine():
            ThreePointArc((19.7751553542, 0), (19.1309149369, -5.006482094), (17.2401701661, -9.6867591034))
            add(Edge.make_bspline(
                [(21.3599053403, -14.760286077), (19.3091128136, -12.0282102505), (17.2401701661, -9.6867591034)],
                knots=[5.1031091849, 5.1031091849, 5.1031091849, 5.2970750731, 5.2970750731, 5.2970750731], degree=2, weights=[1, 0.9953008392, 1]))
            ThreePointArc((21.3599053403, -14.760286077), (24.7860132424, -7.7307922469), (25.9636592417, 0))
            ThreePointArc((25.9636592417, 0), (25.7159472691, 3.5779403673), (24.9775380519, 7.0876084884))
            add(Edge.make_bspline(
                [(19.4423418396, 3.6127708305), (22.1555760412, 5.1623763676), (24.9775380519, 7.0876084884)],
                knots=[0.9861102341, 0.9861102341, 0.9861102341, 1.1800761223, 1.1800761223, 1.1800761223], degree=2, weights=[1, 0.9953008392, 1]))
            ThreePointArc((19.4423418396, 3.6127708305), (19.6917761973, 1.8140340342), (19.7751553542, 0))
        make_face()
    extrude(amount=F1_DEPTH)


solid = Compound([f1.part, f1b.part, f1c.part, f1d.part, f1e.part, f1f.part, f1g.part])
